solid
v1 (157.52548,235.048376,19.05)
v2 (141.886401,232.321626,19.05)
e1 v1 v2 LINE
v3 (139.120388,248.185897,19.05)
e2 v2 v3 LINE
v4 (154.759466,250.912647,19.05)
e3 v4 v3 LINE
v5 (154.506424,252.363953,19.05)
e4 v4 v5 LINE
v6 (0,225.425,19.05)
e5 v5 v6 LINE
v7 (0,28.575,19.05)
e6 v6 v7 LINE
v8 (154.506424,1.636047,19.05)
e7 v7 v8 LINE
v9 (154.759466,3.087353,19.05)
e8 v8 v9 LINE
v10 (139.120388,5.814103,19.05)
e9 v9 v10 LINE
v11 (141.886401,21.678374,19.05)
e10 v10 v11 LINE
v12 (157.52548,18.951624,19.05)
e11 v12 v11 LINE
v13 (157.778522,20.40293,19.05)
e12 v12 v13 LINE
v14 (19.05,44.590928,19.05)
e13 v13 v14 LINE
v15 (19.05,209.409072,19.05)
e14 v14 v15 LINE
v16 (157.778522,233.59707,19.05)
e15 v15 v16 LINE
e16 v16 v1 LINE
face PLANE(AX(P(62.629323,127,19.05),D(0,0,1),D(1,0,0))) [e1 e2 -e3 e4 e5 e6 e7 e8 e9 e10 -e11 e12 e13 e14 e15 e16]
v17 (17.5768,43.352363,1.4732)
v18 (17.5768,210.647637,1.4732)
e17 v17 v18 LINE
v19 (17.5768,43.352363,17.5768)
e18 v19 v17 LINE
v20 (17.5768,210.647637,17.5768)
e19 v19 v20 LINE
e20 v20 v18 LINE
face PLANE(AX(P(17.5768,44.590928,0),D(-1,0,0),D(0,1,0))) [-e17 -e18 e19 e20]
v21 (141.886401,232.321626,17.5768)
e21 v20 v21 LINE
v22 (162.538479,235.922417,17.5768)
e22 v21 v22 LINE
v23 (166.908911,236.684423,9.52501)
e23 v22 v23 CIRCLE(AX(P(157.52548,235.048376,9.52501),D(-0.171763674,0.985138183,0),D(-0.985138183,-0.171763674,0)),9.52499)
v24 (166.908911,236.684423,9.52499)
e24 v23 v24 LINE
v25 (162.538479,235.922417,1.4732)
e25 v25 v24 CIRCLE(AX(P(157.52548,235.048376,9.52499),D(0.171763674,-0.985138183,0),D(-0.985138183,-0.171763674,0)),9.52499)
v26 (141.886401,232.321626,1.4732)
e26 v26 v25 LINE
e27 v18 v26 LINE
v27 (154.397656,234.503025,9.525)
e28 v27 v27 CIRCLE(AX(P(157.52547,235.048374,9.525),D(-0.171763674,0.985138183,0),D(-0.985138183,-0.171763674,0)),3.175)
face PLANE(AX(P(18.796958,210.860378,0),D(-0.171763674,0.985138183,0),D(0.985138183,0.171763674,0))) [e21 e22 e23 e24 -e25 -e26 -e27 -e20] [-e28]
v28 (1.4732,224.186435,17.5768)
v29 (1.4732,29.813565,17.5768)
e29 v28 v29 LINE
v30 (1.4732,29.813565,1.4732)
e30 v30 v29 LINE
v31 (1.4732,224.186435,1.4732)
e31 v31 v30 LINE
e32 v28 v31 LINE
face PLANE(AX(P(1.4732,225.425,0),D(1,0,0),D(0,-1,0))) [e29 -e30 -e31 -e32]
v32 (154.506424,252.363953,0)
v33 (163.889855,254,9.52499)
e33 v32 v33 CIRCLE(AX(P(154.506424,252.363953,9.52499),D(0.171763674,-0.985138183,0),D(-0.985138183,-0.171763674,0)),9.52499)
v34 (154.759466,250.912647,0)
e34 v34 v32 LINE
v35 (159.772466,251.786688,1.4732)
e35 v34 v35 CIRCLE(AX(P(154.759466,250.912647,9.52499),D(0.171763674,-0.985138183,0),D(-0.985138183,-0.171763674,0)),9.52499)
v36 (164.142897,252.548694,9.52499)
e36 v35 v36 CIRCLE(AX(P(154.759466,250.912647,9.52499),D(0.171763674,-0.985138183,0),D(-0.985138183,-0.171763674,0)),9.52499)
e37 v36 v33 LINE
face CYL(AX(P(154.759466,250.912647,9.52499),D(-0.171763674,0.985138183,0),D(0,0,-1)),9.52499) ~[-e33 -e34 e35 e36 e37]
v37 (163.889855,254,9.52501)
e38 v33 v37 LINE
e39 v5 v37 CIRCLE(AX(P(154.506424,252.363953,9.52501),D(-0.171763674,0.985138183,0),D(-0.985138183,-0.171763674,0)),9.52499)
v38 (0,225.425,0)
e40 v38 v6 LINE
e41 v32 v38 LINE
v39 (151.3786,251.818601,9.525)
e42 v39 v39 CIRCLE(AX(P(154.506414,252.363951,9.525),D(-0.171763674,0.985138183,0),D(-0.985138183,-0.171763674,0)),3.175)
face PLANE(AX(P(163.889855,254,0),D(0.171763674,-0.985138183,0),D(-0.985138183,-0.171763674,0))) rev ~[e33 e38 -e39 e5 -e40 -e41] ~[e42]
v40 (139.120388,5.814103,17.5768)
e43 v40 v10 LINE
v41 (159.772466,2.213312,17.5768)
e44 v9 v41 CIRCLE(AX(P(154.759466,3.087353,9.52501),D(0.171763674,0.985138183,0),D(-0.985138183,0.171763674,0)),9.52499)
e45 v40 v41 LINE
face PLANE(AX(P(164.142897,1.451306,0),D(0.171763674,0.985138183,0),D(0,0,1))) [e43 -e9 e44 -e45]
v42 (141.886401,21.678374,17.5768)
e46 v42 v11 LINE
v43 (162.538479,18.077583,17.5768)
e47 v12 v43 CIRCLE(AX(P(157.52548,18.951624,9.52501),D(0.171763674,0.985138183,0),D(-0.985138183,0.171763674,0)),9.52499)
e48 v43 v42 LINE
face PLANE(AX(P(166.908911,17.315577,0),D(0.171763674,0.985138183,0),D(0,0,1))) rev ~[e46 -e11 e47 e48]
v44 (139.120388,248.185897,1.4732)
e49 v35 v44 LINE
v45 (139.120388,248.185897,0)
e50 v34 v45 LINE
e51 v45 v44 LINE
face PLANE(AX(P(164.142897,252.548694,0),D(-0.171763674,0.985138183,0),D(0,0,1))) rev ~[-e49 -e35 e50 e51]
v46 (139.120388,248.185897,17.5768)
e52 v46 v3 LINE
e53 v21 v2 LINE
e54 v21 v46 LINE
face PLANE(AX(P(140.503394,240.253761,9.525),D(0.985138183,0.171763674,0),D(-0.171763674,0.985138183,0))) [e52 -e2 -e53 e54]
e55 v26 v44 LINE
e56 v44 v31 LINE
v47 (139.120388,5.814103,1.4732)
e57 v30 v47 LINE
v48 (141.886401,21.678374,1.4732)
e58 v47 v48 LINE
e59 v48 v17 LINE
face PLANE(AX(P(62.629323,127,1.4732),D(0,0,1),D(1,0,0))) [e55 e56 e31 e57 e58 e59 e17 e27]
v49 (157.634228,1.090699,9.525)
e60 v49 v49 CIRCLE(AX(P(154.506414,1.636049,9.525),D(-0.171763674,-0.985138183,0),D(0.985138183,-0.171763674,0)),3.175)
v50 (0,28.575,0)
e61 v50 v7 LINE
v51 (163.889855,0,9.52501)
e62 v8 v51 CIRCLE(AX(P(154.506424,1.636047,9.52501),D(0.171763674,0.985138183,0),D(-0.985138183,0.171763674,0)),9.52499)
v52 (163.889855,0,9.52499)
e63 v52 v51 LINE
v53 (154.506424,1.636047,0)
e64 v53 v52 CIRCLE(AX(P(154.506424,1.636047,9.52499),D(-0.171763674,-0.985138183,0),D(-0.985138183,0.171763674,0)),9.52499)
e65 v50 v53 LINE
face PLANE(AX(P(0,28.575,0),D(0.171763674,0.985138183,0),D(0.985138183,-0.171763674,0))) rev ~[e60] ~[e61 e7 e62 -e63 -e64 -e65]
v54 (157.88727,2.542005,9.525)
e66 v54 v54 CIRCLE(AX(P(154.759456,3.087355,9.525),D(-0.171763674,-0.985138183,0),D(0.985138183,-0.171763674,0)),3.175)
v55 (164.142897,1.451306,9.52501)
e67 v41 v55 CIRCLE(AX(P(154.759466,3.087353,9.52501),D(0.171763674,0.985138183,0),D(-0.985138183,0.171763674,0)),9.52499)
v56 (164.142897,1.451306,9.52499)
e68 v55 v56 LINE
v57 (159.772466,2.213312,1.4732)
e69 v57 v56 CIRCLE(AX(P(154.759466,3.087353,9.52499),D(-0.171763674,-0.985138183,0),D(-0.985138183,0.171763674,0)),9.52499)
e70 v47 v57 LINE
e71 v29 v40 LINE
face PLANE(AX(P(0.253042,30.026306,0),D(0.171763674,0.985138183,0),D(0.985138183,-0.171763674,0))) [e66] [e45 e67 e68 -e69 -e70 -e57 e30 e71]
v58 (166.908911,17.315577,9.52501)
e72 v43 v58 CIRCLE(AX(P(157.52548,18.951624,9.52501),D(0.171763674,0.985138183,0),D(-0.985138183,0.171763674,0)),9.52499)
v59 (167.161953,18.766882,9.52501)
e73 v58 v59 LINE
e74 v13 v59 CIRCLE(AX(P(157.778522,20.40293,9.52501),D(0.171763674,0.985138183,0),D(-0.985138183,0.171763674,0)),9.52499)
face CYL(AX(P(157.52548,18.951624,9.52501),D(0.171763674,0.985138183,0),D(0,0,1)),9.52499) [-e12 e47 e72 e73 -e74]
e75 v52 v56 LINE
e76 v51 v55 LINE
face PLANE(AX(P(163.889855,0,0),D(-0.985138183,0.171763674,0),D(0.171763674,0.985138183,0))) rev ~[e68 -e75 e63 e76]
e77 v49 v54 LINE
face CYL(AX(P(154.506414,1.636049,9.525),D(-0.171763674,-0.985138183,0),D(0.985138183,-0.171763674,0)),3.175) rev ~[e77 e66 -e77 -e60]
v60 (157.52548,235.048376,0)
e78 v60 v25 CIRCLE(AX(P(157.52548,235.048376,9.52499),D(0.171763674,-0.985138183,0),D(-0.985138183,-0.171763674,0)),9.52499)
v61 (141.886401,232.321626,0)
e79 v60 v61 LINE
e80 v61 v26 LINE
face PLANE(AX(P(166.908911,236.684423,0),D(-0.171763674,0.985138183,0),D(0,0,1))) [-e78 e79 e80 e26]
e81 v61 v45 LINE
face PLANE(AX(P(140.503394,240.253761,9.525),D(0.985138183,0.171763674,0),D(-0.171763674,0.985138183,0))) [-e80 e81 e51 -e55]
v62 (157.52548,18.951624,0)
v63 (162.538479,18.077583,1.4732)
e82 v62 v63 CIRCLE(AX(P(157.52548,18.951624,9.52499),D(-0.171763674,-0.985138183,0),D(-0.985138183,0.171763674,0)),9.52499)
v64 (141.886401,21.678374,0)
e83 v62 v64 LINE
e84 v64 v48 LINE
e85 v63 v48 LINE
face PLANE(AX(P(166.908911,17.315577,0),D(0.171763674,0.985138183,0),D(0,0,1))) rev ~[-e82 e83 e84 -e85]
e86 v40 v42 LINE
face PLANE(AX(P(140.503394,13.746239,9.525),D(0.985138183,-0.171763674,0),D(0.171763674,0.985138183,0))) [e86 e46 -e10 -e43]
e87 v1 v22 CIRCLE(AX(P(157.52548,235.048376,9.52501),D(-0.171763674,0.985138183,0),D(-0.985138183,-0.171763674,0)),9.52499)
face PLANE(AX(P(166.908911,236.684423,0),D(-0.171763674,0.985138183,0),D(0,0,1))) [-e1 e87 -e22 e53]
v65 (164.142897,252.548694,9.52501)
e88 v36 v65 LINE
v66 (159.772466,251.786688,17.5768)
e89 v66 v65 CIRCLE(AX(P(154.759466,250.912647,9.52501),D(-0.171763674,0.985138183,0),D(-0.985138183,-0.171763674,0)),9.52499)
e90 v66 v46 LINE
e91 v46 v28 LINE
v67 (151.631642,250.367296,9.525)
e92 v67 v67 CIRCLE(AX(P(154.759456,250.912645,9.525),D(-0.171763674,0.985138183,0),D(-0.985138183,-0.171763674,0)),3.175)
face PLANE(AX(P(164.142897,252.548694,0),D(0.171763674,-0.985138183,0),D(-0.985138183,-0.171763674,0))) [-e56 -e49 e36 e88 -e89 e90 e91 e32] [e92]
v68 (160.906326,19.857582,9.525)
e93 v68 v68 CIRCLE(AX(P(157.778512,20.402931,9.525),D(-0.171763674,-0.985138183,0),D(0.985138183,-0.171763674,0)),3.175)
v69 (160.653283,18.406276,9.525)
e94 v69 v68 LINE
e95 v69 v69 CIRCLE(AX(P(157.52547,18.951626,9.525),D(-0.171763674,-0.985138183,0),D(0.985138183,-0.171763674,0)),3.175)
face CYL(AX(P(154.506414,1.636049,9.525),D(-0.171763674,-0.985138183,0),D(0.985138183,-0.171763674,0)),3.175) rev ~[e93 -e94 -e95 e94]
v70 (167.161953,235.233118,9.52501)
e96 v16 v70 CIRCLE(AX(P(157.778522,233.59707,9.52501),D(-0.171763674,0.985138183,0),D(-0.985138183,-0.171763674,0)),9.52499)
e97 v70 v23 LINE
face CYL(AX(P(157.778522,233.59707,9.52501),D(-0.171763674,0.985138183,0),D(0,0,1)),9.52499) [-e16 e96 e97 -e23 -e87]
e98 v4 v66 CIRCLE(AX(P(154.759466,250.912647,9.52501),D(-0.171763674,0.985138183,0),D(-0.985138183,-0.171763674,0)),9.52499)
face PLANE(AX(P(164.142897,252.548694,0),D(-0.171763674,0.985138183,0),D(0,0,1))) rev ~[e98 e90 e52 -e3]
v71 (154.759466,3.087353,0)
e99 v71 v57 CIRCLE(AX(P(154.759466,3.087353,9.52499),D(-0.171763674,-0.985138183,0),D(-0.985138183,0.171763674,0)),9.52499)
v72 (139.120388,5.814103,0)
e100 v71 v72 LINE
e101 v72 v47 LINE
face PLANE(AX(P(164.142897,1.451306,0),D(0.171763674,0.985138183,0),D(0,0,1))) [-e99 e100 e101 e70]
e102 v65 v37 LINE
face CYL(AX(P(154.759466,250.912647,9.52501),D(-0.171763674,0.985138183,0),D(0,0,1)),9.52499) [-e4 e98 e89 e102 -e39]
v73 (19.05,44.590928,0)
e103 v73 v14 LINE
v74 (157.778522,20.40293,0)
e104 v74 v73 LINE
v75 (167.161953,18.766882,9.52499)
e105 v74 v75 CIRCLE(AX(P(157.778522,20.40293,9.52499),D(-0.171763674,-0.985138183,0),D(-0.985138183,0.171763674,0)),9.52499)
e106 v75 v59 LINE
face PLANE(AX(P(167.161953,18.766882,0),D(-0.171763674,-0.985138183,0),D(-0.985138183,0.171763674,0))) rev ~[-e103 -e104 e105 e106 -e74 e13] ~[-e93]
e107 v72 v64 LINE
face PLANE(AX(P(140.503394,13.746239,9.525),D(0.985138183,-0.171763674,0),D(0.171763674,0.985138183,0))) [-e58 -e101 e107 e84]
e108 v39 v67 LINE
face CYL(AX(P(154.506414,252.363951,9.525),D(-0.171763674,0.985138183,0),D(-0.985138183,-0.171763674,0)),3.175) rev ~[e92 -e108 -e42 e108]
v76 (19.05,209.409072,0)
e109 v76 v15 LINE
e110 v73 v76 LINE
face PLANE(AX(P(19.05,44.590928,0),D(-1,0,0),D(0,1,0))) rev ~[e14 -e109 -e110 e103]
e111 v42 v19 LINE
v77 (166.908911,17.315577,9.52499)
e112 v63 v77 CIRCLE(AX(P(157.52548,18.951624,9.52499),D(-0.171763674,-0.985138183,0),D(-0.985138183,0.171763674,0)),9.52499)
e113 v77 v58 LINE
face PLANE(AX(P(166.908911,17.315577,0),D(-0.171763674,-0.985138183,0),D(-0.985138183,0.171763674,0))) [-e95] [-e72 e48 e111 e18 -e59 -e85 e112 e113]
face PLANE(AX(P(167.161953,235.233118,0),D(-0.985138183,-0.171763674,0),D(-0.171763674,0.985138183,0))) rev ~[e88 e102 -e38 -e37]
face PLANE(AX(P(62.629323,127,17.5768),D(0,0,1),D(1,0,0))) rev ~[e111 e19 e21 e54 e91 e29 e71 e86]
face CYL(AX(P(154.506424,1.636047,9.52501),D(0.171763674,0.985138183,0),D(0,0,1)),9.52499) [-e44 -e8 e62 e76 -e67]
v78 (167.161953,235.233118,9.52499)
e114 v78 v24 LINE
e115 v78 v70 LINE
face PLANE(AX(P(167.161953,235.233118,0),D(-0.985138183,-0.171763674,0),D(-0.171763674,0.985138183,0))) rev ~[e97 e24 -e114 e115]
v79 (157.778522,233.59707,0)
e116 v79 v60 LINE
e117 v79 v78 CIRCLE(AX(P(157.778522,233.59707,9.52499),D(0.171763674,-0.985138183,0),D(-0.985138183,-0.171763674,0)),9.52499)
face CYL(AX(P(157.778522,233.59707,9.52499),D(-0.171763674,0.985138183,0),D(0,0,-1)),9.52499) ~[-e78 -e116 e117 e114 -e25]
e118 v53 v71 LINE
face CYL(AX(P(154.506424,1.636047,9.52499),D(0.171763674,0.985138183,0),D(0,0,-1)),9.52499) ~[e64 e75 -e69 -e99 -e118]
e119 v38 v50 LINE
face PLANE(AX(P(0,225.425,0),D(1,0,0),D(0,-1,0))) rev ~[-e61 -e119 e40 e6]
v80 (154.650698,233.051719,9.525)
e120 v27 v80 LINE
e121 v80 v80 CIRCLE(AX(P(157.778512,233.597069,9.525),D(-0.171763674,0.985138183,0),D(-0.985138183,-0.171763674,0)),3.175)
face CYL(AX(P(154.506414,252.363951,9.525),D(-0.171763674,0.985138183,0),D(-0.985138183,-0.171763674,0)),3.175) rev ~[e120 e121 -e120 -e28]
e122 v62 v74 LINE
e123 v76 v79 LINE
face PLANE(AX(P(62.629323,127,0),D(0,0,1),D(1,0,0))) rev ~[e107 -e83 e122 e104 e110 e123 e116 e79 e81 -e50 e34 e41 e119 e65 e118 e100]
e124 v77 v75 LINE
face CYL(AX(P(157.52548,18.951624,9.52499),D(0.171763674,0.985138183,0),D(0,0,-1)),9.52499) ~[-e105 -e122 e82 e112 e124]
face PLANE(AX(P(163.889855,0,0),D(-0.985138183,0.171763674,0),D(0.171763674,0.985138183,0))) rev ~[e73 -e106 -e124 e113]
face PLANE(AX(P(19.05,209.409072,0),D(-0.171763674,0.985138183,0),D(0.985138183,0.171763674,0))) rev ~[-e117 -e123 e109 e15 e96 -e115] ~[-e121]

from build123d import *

# Parameters (mm, degrees)
F1_DEPTH  = 19.05
F2_T      = -1.4732
F3_W      = 16.1036
F3_H      = 19.05
F4_DEPTH  = 25.4
F5_R      = 9.52499
F6_R      = 3.175
F7_DEPTH  = 250.7881261572
F8_W      = 16.1036
F8_H      = 19.05
F9_DEPTH  = 25.4
F10_R     = 9.52499
F11_R     = 3.175
F12_DEPTH = 250.7881261572


# Not quite as in the source:
# - a fillet or chamfer is up to 0.001 mm smaller than in the source, because OpenCascade refuses the exact size


with BuildPart() as f1:
    # F0 (on Top) → F1 (new body)
    with BuildSketch(Plane.XY):
        Polygon((0, 225.425), (0, 28.575), (163.8898551464, 0), (167.1619531291, 18.766882394), (19.05, 44.5909277987), (19.05, 209.4090722013), (167.1619531291, 235.233117606), (163.8898551464, 254), align=None)
    extrude(amount=F1_DEPTH)

    # F2
    f2_openings = [f1.faces().sort_by_distance(p)[0] for p in [
        (165.525904, 9.383441, 9.525),
        (165.525904, 244.616559, 9.525),
    ]]
    offset(amount=F2_T, openings=f2_openings, kind=Kind.INTERSECTION)

    # F3 (on face) → F4 (cut)
    with BuildSketch(Plane(origin=(159.0546521525, -27.731958645, 0), x_dir=(0.1717636736, 0.9851381834, 0), z_dir=(0.9851381834, -0.1717636736, 0))):
        with Locations((37.6753235911, 9.525)):
            Rectangle(F3_W, F3_H)
    extrude(amount=-F4_DEPTH, mode=Mode.SUBTRACT)

    # F5 (radius 9.525 in the source; OpenCascade refuses exactly that, so slightly less here)
    f5_edges = [f1.edges().sort_by_distance(p)[0] for p in [
        (164.016376, 0.725653, 19.05),
        (167.035432, 18.04123, 19.05),
        (164.016376, 0.725653, 0),
        (167.035432, 18.04123, 0),
    ]]
    fillet(f5_edges, radius=F5_R)

    # F6 (on face) → F7 (cut, through all)
    with BuildSketch(Plane(origin=(4.8352029939, 27.731958645, 0), x_dir=(0.9851381834, -0.1717636736, 0), z_dir=(-0.1717636736, -0.9851381834, 0))):
        with Locations((151.9291541789, 9.525)):
            Circle(F6_R)
    extrude(amount=-F7_DEPTH, mode=Mode.SUBTRACT)

    # F8 (on face) → F9 (cut)
    with BuildSketch(Plane(origin=(202.0342343209, 35.2256595783, 0), x_dir=(-0.1717636736, 0.9851381834, 0), z_dir=(0.9851381834, 0.1717636736, 0))):
        with Locations((212.5497749961, 9.525)):
            Rectangle(F8_W, F8_H)
    extrude(amount=-F9_DEPTH, mode=Mode.SUBTRACT)

    # F10 (radius 9.525 in the source; OpenCascade refuses exactly that, so slightly less here)
    f10_edges = [f1.edges().sort_by_distance(p)[0] for p in [
        (164.016376, 253.274347, 0),
        (164.016376, 253.274347, 19.05),
        (167.035432, 235.95877, 19.05),
        (167.035432, 235.95877, 0),
    ]]
    fillet(f10_edges, radius=F10_R)

    # F11 (on face) → F12 (cut, through all)
    with BuildSketch(Plane(origin=(-38.1443791745, 218.7743404217, 0), x_dir=(-0.9851381834, -0.1717636736, 0), z_dir=(-0.1717636736, 0.9851381834, 0))):
        with Locations((-195.5571272816, 9.525)):
            Circle(F11_R)
    extrude(amount=-F12_DEPTH, mode=Mode.SUBTRACT)


solid = f1.part
